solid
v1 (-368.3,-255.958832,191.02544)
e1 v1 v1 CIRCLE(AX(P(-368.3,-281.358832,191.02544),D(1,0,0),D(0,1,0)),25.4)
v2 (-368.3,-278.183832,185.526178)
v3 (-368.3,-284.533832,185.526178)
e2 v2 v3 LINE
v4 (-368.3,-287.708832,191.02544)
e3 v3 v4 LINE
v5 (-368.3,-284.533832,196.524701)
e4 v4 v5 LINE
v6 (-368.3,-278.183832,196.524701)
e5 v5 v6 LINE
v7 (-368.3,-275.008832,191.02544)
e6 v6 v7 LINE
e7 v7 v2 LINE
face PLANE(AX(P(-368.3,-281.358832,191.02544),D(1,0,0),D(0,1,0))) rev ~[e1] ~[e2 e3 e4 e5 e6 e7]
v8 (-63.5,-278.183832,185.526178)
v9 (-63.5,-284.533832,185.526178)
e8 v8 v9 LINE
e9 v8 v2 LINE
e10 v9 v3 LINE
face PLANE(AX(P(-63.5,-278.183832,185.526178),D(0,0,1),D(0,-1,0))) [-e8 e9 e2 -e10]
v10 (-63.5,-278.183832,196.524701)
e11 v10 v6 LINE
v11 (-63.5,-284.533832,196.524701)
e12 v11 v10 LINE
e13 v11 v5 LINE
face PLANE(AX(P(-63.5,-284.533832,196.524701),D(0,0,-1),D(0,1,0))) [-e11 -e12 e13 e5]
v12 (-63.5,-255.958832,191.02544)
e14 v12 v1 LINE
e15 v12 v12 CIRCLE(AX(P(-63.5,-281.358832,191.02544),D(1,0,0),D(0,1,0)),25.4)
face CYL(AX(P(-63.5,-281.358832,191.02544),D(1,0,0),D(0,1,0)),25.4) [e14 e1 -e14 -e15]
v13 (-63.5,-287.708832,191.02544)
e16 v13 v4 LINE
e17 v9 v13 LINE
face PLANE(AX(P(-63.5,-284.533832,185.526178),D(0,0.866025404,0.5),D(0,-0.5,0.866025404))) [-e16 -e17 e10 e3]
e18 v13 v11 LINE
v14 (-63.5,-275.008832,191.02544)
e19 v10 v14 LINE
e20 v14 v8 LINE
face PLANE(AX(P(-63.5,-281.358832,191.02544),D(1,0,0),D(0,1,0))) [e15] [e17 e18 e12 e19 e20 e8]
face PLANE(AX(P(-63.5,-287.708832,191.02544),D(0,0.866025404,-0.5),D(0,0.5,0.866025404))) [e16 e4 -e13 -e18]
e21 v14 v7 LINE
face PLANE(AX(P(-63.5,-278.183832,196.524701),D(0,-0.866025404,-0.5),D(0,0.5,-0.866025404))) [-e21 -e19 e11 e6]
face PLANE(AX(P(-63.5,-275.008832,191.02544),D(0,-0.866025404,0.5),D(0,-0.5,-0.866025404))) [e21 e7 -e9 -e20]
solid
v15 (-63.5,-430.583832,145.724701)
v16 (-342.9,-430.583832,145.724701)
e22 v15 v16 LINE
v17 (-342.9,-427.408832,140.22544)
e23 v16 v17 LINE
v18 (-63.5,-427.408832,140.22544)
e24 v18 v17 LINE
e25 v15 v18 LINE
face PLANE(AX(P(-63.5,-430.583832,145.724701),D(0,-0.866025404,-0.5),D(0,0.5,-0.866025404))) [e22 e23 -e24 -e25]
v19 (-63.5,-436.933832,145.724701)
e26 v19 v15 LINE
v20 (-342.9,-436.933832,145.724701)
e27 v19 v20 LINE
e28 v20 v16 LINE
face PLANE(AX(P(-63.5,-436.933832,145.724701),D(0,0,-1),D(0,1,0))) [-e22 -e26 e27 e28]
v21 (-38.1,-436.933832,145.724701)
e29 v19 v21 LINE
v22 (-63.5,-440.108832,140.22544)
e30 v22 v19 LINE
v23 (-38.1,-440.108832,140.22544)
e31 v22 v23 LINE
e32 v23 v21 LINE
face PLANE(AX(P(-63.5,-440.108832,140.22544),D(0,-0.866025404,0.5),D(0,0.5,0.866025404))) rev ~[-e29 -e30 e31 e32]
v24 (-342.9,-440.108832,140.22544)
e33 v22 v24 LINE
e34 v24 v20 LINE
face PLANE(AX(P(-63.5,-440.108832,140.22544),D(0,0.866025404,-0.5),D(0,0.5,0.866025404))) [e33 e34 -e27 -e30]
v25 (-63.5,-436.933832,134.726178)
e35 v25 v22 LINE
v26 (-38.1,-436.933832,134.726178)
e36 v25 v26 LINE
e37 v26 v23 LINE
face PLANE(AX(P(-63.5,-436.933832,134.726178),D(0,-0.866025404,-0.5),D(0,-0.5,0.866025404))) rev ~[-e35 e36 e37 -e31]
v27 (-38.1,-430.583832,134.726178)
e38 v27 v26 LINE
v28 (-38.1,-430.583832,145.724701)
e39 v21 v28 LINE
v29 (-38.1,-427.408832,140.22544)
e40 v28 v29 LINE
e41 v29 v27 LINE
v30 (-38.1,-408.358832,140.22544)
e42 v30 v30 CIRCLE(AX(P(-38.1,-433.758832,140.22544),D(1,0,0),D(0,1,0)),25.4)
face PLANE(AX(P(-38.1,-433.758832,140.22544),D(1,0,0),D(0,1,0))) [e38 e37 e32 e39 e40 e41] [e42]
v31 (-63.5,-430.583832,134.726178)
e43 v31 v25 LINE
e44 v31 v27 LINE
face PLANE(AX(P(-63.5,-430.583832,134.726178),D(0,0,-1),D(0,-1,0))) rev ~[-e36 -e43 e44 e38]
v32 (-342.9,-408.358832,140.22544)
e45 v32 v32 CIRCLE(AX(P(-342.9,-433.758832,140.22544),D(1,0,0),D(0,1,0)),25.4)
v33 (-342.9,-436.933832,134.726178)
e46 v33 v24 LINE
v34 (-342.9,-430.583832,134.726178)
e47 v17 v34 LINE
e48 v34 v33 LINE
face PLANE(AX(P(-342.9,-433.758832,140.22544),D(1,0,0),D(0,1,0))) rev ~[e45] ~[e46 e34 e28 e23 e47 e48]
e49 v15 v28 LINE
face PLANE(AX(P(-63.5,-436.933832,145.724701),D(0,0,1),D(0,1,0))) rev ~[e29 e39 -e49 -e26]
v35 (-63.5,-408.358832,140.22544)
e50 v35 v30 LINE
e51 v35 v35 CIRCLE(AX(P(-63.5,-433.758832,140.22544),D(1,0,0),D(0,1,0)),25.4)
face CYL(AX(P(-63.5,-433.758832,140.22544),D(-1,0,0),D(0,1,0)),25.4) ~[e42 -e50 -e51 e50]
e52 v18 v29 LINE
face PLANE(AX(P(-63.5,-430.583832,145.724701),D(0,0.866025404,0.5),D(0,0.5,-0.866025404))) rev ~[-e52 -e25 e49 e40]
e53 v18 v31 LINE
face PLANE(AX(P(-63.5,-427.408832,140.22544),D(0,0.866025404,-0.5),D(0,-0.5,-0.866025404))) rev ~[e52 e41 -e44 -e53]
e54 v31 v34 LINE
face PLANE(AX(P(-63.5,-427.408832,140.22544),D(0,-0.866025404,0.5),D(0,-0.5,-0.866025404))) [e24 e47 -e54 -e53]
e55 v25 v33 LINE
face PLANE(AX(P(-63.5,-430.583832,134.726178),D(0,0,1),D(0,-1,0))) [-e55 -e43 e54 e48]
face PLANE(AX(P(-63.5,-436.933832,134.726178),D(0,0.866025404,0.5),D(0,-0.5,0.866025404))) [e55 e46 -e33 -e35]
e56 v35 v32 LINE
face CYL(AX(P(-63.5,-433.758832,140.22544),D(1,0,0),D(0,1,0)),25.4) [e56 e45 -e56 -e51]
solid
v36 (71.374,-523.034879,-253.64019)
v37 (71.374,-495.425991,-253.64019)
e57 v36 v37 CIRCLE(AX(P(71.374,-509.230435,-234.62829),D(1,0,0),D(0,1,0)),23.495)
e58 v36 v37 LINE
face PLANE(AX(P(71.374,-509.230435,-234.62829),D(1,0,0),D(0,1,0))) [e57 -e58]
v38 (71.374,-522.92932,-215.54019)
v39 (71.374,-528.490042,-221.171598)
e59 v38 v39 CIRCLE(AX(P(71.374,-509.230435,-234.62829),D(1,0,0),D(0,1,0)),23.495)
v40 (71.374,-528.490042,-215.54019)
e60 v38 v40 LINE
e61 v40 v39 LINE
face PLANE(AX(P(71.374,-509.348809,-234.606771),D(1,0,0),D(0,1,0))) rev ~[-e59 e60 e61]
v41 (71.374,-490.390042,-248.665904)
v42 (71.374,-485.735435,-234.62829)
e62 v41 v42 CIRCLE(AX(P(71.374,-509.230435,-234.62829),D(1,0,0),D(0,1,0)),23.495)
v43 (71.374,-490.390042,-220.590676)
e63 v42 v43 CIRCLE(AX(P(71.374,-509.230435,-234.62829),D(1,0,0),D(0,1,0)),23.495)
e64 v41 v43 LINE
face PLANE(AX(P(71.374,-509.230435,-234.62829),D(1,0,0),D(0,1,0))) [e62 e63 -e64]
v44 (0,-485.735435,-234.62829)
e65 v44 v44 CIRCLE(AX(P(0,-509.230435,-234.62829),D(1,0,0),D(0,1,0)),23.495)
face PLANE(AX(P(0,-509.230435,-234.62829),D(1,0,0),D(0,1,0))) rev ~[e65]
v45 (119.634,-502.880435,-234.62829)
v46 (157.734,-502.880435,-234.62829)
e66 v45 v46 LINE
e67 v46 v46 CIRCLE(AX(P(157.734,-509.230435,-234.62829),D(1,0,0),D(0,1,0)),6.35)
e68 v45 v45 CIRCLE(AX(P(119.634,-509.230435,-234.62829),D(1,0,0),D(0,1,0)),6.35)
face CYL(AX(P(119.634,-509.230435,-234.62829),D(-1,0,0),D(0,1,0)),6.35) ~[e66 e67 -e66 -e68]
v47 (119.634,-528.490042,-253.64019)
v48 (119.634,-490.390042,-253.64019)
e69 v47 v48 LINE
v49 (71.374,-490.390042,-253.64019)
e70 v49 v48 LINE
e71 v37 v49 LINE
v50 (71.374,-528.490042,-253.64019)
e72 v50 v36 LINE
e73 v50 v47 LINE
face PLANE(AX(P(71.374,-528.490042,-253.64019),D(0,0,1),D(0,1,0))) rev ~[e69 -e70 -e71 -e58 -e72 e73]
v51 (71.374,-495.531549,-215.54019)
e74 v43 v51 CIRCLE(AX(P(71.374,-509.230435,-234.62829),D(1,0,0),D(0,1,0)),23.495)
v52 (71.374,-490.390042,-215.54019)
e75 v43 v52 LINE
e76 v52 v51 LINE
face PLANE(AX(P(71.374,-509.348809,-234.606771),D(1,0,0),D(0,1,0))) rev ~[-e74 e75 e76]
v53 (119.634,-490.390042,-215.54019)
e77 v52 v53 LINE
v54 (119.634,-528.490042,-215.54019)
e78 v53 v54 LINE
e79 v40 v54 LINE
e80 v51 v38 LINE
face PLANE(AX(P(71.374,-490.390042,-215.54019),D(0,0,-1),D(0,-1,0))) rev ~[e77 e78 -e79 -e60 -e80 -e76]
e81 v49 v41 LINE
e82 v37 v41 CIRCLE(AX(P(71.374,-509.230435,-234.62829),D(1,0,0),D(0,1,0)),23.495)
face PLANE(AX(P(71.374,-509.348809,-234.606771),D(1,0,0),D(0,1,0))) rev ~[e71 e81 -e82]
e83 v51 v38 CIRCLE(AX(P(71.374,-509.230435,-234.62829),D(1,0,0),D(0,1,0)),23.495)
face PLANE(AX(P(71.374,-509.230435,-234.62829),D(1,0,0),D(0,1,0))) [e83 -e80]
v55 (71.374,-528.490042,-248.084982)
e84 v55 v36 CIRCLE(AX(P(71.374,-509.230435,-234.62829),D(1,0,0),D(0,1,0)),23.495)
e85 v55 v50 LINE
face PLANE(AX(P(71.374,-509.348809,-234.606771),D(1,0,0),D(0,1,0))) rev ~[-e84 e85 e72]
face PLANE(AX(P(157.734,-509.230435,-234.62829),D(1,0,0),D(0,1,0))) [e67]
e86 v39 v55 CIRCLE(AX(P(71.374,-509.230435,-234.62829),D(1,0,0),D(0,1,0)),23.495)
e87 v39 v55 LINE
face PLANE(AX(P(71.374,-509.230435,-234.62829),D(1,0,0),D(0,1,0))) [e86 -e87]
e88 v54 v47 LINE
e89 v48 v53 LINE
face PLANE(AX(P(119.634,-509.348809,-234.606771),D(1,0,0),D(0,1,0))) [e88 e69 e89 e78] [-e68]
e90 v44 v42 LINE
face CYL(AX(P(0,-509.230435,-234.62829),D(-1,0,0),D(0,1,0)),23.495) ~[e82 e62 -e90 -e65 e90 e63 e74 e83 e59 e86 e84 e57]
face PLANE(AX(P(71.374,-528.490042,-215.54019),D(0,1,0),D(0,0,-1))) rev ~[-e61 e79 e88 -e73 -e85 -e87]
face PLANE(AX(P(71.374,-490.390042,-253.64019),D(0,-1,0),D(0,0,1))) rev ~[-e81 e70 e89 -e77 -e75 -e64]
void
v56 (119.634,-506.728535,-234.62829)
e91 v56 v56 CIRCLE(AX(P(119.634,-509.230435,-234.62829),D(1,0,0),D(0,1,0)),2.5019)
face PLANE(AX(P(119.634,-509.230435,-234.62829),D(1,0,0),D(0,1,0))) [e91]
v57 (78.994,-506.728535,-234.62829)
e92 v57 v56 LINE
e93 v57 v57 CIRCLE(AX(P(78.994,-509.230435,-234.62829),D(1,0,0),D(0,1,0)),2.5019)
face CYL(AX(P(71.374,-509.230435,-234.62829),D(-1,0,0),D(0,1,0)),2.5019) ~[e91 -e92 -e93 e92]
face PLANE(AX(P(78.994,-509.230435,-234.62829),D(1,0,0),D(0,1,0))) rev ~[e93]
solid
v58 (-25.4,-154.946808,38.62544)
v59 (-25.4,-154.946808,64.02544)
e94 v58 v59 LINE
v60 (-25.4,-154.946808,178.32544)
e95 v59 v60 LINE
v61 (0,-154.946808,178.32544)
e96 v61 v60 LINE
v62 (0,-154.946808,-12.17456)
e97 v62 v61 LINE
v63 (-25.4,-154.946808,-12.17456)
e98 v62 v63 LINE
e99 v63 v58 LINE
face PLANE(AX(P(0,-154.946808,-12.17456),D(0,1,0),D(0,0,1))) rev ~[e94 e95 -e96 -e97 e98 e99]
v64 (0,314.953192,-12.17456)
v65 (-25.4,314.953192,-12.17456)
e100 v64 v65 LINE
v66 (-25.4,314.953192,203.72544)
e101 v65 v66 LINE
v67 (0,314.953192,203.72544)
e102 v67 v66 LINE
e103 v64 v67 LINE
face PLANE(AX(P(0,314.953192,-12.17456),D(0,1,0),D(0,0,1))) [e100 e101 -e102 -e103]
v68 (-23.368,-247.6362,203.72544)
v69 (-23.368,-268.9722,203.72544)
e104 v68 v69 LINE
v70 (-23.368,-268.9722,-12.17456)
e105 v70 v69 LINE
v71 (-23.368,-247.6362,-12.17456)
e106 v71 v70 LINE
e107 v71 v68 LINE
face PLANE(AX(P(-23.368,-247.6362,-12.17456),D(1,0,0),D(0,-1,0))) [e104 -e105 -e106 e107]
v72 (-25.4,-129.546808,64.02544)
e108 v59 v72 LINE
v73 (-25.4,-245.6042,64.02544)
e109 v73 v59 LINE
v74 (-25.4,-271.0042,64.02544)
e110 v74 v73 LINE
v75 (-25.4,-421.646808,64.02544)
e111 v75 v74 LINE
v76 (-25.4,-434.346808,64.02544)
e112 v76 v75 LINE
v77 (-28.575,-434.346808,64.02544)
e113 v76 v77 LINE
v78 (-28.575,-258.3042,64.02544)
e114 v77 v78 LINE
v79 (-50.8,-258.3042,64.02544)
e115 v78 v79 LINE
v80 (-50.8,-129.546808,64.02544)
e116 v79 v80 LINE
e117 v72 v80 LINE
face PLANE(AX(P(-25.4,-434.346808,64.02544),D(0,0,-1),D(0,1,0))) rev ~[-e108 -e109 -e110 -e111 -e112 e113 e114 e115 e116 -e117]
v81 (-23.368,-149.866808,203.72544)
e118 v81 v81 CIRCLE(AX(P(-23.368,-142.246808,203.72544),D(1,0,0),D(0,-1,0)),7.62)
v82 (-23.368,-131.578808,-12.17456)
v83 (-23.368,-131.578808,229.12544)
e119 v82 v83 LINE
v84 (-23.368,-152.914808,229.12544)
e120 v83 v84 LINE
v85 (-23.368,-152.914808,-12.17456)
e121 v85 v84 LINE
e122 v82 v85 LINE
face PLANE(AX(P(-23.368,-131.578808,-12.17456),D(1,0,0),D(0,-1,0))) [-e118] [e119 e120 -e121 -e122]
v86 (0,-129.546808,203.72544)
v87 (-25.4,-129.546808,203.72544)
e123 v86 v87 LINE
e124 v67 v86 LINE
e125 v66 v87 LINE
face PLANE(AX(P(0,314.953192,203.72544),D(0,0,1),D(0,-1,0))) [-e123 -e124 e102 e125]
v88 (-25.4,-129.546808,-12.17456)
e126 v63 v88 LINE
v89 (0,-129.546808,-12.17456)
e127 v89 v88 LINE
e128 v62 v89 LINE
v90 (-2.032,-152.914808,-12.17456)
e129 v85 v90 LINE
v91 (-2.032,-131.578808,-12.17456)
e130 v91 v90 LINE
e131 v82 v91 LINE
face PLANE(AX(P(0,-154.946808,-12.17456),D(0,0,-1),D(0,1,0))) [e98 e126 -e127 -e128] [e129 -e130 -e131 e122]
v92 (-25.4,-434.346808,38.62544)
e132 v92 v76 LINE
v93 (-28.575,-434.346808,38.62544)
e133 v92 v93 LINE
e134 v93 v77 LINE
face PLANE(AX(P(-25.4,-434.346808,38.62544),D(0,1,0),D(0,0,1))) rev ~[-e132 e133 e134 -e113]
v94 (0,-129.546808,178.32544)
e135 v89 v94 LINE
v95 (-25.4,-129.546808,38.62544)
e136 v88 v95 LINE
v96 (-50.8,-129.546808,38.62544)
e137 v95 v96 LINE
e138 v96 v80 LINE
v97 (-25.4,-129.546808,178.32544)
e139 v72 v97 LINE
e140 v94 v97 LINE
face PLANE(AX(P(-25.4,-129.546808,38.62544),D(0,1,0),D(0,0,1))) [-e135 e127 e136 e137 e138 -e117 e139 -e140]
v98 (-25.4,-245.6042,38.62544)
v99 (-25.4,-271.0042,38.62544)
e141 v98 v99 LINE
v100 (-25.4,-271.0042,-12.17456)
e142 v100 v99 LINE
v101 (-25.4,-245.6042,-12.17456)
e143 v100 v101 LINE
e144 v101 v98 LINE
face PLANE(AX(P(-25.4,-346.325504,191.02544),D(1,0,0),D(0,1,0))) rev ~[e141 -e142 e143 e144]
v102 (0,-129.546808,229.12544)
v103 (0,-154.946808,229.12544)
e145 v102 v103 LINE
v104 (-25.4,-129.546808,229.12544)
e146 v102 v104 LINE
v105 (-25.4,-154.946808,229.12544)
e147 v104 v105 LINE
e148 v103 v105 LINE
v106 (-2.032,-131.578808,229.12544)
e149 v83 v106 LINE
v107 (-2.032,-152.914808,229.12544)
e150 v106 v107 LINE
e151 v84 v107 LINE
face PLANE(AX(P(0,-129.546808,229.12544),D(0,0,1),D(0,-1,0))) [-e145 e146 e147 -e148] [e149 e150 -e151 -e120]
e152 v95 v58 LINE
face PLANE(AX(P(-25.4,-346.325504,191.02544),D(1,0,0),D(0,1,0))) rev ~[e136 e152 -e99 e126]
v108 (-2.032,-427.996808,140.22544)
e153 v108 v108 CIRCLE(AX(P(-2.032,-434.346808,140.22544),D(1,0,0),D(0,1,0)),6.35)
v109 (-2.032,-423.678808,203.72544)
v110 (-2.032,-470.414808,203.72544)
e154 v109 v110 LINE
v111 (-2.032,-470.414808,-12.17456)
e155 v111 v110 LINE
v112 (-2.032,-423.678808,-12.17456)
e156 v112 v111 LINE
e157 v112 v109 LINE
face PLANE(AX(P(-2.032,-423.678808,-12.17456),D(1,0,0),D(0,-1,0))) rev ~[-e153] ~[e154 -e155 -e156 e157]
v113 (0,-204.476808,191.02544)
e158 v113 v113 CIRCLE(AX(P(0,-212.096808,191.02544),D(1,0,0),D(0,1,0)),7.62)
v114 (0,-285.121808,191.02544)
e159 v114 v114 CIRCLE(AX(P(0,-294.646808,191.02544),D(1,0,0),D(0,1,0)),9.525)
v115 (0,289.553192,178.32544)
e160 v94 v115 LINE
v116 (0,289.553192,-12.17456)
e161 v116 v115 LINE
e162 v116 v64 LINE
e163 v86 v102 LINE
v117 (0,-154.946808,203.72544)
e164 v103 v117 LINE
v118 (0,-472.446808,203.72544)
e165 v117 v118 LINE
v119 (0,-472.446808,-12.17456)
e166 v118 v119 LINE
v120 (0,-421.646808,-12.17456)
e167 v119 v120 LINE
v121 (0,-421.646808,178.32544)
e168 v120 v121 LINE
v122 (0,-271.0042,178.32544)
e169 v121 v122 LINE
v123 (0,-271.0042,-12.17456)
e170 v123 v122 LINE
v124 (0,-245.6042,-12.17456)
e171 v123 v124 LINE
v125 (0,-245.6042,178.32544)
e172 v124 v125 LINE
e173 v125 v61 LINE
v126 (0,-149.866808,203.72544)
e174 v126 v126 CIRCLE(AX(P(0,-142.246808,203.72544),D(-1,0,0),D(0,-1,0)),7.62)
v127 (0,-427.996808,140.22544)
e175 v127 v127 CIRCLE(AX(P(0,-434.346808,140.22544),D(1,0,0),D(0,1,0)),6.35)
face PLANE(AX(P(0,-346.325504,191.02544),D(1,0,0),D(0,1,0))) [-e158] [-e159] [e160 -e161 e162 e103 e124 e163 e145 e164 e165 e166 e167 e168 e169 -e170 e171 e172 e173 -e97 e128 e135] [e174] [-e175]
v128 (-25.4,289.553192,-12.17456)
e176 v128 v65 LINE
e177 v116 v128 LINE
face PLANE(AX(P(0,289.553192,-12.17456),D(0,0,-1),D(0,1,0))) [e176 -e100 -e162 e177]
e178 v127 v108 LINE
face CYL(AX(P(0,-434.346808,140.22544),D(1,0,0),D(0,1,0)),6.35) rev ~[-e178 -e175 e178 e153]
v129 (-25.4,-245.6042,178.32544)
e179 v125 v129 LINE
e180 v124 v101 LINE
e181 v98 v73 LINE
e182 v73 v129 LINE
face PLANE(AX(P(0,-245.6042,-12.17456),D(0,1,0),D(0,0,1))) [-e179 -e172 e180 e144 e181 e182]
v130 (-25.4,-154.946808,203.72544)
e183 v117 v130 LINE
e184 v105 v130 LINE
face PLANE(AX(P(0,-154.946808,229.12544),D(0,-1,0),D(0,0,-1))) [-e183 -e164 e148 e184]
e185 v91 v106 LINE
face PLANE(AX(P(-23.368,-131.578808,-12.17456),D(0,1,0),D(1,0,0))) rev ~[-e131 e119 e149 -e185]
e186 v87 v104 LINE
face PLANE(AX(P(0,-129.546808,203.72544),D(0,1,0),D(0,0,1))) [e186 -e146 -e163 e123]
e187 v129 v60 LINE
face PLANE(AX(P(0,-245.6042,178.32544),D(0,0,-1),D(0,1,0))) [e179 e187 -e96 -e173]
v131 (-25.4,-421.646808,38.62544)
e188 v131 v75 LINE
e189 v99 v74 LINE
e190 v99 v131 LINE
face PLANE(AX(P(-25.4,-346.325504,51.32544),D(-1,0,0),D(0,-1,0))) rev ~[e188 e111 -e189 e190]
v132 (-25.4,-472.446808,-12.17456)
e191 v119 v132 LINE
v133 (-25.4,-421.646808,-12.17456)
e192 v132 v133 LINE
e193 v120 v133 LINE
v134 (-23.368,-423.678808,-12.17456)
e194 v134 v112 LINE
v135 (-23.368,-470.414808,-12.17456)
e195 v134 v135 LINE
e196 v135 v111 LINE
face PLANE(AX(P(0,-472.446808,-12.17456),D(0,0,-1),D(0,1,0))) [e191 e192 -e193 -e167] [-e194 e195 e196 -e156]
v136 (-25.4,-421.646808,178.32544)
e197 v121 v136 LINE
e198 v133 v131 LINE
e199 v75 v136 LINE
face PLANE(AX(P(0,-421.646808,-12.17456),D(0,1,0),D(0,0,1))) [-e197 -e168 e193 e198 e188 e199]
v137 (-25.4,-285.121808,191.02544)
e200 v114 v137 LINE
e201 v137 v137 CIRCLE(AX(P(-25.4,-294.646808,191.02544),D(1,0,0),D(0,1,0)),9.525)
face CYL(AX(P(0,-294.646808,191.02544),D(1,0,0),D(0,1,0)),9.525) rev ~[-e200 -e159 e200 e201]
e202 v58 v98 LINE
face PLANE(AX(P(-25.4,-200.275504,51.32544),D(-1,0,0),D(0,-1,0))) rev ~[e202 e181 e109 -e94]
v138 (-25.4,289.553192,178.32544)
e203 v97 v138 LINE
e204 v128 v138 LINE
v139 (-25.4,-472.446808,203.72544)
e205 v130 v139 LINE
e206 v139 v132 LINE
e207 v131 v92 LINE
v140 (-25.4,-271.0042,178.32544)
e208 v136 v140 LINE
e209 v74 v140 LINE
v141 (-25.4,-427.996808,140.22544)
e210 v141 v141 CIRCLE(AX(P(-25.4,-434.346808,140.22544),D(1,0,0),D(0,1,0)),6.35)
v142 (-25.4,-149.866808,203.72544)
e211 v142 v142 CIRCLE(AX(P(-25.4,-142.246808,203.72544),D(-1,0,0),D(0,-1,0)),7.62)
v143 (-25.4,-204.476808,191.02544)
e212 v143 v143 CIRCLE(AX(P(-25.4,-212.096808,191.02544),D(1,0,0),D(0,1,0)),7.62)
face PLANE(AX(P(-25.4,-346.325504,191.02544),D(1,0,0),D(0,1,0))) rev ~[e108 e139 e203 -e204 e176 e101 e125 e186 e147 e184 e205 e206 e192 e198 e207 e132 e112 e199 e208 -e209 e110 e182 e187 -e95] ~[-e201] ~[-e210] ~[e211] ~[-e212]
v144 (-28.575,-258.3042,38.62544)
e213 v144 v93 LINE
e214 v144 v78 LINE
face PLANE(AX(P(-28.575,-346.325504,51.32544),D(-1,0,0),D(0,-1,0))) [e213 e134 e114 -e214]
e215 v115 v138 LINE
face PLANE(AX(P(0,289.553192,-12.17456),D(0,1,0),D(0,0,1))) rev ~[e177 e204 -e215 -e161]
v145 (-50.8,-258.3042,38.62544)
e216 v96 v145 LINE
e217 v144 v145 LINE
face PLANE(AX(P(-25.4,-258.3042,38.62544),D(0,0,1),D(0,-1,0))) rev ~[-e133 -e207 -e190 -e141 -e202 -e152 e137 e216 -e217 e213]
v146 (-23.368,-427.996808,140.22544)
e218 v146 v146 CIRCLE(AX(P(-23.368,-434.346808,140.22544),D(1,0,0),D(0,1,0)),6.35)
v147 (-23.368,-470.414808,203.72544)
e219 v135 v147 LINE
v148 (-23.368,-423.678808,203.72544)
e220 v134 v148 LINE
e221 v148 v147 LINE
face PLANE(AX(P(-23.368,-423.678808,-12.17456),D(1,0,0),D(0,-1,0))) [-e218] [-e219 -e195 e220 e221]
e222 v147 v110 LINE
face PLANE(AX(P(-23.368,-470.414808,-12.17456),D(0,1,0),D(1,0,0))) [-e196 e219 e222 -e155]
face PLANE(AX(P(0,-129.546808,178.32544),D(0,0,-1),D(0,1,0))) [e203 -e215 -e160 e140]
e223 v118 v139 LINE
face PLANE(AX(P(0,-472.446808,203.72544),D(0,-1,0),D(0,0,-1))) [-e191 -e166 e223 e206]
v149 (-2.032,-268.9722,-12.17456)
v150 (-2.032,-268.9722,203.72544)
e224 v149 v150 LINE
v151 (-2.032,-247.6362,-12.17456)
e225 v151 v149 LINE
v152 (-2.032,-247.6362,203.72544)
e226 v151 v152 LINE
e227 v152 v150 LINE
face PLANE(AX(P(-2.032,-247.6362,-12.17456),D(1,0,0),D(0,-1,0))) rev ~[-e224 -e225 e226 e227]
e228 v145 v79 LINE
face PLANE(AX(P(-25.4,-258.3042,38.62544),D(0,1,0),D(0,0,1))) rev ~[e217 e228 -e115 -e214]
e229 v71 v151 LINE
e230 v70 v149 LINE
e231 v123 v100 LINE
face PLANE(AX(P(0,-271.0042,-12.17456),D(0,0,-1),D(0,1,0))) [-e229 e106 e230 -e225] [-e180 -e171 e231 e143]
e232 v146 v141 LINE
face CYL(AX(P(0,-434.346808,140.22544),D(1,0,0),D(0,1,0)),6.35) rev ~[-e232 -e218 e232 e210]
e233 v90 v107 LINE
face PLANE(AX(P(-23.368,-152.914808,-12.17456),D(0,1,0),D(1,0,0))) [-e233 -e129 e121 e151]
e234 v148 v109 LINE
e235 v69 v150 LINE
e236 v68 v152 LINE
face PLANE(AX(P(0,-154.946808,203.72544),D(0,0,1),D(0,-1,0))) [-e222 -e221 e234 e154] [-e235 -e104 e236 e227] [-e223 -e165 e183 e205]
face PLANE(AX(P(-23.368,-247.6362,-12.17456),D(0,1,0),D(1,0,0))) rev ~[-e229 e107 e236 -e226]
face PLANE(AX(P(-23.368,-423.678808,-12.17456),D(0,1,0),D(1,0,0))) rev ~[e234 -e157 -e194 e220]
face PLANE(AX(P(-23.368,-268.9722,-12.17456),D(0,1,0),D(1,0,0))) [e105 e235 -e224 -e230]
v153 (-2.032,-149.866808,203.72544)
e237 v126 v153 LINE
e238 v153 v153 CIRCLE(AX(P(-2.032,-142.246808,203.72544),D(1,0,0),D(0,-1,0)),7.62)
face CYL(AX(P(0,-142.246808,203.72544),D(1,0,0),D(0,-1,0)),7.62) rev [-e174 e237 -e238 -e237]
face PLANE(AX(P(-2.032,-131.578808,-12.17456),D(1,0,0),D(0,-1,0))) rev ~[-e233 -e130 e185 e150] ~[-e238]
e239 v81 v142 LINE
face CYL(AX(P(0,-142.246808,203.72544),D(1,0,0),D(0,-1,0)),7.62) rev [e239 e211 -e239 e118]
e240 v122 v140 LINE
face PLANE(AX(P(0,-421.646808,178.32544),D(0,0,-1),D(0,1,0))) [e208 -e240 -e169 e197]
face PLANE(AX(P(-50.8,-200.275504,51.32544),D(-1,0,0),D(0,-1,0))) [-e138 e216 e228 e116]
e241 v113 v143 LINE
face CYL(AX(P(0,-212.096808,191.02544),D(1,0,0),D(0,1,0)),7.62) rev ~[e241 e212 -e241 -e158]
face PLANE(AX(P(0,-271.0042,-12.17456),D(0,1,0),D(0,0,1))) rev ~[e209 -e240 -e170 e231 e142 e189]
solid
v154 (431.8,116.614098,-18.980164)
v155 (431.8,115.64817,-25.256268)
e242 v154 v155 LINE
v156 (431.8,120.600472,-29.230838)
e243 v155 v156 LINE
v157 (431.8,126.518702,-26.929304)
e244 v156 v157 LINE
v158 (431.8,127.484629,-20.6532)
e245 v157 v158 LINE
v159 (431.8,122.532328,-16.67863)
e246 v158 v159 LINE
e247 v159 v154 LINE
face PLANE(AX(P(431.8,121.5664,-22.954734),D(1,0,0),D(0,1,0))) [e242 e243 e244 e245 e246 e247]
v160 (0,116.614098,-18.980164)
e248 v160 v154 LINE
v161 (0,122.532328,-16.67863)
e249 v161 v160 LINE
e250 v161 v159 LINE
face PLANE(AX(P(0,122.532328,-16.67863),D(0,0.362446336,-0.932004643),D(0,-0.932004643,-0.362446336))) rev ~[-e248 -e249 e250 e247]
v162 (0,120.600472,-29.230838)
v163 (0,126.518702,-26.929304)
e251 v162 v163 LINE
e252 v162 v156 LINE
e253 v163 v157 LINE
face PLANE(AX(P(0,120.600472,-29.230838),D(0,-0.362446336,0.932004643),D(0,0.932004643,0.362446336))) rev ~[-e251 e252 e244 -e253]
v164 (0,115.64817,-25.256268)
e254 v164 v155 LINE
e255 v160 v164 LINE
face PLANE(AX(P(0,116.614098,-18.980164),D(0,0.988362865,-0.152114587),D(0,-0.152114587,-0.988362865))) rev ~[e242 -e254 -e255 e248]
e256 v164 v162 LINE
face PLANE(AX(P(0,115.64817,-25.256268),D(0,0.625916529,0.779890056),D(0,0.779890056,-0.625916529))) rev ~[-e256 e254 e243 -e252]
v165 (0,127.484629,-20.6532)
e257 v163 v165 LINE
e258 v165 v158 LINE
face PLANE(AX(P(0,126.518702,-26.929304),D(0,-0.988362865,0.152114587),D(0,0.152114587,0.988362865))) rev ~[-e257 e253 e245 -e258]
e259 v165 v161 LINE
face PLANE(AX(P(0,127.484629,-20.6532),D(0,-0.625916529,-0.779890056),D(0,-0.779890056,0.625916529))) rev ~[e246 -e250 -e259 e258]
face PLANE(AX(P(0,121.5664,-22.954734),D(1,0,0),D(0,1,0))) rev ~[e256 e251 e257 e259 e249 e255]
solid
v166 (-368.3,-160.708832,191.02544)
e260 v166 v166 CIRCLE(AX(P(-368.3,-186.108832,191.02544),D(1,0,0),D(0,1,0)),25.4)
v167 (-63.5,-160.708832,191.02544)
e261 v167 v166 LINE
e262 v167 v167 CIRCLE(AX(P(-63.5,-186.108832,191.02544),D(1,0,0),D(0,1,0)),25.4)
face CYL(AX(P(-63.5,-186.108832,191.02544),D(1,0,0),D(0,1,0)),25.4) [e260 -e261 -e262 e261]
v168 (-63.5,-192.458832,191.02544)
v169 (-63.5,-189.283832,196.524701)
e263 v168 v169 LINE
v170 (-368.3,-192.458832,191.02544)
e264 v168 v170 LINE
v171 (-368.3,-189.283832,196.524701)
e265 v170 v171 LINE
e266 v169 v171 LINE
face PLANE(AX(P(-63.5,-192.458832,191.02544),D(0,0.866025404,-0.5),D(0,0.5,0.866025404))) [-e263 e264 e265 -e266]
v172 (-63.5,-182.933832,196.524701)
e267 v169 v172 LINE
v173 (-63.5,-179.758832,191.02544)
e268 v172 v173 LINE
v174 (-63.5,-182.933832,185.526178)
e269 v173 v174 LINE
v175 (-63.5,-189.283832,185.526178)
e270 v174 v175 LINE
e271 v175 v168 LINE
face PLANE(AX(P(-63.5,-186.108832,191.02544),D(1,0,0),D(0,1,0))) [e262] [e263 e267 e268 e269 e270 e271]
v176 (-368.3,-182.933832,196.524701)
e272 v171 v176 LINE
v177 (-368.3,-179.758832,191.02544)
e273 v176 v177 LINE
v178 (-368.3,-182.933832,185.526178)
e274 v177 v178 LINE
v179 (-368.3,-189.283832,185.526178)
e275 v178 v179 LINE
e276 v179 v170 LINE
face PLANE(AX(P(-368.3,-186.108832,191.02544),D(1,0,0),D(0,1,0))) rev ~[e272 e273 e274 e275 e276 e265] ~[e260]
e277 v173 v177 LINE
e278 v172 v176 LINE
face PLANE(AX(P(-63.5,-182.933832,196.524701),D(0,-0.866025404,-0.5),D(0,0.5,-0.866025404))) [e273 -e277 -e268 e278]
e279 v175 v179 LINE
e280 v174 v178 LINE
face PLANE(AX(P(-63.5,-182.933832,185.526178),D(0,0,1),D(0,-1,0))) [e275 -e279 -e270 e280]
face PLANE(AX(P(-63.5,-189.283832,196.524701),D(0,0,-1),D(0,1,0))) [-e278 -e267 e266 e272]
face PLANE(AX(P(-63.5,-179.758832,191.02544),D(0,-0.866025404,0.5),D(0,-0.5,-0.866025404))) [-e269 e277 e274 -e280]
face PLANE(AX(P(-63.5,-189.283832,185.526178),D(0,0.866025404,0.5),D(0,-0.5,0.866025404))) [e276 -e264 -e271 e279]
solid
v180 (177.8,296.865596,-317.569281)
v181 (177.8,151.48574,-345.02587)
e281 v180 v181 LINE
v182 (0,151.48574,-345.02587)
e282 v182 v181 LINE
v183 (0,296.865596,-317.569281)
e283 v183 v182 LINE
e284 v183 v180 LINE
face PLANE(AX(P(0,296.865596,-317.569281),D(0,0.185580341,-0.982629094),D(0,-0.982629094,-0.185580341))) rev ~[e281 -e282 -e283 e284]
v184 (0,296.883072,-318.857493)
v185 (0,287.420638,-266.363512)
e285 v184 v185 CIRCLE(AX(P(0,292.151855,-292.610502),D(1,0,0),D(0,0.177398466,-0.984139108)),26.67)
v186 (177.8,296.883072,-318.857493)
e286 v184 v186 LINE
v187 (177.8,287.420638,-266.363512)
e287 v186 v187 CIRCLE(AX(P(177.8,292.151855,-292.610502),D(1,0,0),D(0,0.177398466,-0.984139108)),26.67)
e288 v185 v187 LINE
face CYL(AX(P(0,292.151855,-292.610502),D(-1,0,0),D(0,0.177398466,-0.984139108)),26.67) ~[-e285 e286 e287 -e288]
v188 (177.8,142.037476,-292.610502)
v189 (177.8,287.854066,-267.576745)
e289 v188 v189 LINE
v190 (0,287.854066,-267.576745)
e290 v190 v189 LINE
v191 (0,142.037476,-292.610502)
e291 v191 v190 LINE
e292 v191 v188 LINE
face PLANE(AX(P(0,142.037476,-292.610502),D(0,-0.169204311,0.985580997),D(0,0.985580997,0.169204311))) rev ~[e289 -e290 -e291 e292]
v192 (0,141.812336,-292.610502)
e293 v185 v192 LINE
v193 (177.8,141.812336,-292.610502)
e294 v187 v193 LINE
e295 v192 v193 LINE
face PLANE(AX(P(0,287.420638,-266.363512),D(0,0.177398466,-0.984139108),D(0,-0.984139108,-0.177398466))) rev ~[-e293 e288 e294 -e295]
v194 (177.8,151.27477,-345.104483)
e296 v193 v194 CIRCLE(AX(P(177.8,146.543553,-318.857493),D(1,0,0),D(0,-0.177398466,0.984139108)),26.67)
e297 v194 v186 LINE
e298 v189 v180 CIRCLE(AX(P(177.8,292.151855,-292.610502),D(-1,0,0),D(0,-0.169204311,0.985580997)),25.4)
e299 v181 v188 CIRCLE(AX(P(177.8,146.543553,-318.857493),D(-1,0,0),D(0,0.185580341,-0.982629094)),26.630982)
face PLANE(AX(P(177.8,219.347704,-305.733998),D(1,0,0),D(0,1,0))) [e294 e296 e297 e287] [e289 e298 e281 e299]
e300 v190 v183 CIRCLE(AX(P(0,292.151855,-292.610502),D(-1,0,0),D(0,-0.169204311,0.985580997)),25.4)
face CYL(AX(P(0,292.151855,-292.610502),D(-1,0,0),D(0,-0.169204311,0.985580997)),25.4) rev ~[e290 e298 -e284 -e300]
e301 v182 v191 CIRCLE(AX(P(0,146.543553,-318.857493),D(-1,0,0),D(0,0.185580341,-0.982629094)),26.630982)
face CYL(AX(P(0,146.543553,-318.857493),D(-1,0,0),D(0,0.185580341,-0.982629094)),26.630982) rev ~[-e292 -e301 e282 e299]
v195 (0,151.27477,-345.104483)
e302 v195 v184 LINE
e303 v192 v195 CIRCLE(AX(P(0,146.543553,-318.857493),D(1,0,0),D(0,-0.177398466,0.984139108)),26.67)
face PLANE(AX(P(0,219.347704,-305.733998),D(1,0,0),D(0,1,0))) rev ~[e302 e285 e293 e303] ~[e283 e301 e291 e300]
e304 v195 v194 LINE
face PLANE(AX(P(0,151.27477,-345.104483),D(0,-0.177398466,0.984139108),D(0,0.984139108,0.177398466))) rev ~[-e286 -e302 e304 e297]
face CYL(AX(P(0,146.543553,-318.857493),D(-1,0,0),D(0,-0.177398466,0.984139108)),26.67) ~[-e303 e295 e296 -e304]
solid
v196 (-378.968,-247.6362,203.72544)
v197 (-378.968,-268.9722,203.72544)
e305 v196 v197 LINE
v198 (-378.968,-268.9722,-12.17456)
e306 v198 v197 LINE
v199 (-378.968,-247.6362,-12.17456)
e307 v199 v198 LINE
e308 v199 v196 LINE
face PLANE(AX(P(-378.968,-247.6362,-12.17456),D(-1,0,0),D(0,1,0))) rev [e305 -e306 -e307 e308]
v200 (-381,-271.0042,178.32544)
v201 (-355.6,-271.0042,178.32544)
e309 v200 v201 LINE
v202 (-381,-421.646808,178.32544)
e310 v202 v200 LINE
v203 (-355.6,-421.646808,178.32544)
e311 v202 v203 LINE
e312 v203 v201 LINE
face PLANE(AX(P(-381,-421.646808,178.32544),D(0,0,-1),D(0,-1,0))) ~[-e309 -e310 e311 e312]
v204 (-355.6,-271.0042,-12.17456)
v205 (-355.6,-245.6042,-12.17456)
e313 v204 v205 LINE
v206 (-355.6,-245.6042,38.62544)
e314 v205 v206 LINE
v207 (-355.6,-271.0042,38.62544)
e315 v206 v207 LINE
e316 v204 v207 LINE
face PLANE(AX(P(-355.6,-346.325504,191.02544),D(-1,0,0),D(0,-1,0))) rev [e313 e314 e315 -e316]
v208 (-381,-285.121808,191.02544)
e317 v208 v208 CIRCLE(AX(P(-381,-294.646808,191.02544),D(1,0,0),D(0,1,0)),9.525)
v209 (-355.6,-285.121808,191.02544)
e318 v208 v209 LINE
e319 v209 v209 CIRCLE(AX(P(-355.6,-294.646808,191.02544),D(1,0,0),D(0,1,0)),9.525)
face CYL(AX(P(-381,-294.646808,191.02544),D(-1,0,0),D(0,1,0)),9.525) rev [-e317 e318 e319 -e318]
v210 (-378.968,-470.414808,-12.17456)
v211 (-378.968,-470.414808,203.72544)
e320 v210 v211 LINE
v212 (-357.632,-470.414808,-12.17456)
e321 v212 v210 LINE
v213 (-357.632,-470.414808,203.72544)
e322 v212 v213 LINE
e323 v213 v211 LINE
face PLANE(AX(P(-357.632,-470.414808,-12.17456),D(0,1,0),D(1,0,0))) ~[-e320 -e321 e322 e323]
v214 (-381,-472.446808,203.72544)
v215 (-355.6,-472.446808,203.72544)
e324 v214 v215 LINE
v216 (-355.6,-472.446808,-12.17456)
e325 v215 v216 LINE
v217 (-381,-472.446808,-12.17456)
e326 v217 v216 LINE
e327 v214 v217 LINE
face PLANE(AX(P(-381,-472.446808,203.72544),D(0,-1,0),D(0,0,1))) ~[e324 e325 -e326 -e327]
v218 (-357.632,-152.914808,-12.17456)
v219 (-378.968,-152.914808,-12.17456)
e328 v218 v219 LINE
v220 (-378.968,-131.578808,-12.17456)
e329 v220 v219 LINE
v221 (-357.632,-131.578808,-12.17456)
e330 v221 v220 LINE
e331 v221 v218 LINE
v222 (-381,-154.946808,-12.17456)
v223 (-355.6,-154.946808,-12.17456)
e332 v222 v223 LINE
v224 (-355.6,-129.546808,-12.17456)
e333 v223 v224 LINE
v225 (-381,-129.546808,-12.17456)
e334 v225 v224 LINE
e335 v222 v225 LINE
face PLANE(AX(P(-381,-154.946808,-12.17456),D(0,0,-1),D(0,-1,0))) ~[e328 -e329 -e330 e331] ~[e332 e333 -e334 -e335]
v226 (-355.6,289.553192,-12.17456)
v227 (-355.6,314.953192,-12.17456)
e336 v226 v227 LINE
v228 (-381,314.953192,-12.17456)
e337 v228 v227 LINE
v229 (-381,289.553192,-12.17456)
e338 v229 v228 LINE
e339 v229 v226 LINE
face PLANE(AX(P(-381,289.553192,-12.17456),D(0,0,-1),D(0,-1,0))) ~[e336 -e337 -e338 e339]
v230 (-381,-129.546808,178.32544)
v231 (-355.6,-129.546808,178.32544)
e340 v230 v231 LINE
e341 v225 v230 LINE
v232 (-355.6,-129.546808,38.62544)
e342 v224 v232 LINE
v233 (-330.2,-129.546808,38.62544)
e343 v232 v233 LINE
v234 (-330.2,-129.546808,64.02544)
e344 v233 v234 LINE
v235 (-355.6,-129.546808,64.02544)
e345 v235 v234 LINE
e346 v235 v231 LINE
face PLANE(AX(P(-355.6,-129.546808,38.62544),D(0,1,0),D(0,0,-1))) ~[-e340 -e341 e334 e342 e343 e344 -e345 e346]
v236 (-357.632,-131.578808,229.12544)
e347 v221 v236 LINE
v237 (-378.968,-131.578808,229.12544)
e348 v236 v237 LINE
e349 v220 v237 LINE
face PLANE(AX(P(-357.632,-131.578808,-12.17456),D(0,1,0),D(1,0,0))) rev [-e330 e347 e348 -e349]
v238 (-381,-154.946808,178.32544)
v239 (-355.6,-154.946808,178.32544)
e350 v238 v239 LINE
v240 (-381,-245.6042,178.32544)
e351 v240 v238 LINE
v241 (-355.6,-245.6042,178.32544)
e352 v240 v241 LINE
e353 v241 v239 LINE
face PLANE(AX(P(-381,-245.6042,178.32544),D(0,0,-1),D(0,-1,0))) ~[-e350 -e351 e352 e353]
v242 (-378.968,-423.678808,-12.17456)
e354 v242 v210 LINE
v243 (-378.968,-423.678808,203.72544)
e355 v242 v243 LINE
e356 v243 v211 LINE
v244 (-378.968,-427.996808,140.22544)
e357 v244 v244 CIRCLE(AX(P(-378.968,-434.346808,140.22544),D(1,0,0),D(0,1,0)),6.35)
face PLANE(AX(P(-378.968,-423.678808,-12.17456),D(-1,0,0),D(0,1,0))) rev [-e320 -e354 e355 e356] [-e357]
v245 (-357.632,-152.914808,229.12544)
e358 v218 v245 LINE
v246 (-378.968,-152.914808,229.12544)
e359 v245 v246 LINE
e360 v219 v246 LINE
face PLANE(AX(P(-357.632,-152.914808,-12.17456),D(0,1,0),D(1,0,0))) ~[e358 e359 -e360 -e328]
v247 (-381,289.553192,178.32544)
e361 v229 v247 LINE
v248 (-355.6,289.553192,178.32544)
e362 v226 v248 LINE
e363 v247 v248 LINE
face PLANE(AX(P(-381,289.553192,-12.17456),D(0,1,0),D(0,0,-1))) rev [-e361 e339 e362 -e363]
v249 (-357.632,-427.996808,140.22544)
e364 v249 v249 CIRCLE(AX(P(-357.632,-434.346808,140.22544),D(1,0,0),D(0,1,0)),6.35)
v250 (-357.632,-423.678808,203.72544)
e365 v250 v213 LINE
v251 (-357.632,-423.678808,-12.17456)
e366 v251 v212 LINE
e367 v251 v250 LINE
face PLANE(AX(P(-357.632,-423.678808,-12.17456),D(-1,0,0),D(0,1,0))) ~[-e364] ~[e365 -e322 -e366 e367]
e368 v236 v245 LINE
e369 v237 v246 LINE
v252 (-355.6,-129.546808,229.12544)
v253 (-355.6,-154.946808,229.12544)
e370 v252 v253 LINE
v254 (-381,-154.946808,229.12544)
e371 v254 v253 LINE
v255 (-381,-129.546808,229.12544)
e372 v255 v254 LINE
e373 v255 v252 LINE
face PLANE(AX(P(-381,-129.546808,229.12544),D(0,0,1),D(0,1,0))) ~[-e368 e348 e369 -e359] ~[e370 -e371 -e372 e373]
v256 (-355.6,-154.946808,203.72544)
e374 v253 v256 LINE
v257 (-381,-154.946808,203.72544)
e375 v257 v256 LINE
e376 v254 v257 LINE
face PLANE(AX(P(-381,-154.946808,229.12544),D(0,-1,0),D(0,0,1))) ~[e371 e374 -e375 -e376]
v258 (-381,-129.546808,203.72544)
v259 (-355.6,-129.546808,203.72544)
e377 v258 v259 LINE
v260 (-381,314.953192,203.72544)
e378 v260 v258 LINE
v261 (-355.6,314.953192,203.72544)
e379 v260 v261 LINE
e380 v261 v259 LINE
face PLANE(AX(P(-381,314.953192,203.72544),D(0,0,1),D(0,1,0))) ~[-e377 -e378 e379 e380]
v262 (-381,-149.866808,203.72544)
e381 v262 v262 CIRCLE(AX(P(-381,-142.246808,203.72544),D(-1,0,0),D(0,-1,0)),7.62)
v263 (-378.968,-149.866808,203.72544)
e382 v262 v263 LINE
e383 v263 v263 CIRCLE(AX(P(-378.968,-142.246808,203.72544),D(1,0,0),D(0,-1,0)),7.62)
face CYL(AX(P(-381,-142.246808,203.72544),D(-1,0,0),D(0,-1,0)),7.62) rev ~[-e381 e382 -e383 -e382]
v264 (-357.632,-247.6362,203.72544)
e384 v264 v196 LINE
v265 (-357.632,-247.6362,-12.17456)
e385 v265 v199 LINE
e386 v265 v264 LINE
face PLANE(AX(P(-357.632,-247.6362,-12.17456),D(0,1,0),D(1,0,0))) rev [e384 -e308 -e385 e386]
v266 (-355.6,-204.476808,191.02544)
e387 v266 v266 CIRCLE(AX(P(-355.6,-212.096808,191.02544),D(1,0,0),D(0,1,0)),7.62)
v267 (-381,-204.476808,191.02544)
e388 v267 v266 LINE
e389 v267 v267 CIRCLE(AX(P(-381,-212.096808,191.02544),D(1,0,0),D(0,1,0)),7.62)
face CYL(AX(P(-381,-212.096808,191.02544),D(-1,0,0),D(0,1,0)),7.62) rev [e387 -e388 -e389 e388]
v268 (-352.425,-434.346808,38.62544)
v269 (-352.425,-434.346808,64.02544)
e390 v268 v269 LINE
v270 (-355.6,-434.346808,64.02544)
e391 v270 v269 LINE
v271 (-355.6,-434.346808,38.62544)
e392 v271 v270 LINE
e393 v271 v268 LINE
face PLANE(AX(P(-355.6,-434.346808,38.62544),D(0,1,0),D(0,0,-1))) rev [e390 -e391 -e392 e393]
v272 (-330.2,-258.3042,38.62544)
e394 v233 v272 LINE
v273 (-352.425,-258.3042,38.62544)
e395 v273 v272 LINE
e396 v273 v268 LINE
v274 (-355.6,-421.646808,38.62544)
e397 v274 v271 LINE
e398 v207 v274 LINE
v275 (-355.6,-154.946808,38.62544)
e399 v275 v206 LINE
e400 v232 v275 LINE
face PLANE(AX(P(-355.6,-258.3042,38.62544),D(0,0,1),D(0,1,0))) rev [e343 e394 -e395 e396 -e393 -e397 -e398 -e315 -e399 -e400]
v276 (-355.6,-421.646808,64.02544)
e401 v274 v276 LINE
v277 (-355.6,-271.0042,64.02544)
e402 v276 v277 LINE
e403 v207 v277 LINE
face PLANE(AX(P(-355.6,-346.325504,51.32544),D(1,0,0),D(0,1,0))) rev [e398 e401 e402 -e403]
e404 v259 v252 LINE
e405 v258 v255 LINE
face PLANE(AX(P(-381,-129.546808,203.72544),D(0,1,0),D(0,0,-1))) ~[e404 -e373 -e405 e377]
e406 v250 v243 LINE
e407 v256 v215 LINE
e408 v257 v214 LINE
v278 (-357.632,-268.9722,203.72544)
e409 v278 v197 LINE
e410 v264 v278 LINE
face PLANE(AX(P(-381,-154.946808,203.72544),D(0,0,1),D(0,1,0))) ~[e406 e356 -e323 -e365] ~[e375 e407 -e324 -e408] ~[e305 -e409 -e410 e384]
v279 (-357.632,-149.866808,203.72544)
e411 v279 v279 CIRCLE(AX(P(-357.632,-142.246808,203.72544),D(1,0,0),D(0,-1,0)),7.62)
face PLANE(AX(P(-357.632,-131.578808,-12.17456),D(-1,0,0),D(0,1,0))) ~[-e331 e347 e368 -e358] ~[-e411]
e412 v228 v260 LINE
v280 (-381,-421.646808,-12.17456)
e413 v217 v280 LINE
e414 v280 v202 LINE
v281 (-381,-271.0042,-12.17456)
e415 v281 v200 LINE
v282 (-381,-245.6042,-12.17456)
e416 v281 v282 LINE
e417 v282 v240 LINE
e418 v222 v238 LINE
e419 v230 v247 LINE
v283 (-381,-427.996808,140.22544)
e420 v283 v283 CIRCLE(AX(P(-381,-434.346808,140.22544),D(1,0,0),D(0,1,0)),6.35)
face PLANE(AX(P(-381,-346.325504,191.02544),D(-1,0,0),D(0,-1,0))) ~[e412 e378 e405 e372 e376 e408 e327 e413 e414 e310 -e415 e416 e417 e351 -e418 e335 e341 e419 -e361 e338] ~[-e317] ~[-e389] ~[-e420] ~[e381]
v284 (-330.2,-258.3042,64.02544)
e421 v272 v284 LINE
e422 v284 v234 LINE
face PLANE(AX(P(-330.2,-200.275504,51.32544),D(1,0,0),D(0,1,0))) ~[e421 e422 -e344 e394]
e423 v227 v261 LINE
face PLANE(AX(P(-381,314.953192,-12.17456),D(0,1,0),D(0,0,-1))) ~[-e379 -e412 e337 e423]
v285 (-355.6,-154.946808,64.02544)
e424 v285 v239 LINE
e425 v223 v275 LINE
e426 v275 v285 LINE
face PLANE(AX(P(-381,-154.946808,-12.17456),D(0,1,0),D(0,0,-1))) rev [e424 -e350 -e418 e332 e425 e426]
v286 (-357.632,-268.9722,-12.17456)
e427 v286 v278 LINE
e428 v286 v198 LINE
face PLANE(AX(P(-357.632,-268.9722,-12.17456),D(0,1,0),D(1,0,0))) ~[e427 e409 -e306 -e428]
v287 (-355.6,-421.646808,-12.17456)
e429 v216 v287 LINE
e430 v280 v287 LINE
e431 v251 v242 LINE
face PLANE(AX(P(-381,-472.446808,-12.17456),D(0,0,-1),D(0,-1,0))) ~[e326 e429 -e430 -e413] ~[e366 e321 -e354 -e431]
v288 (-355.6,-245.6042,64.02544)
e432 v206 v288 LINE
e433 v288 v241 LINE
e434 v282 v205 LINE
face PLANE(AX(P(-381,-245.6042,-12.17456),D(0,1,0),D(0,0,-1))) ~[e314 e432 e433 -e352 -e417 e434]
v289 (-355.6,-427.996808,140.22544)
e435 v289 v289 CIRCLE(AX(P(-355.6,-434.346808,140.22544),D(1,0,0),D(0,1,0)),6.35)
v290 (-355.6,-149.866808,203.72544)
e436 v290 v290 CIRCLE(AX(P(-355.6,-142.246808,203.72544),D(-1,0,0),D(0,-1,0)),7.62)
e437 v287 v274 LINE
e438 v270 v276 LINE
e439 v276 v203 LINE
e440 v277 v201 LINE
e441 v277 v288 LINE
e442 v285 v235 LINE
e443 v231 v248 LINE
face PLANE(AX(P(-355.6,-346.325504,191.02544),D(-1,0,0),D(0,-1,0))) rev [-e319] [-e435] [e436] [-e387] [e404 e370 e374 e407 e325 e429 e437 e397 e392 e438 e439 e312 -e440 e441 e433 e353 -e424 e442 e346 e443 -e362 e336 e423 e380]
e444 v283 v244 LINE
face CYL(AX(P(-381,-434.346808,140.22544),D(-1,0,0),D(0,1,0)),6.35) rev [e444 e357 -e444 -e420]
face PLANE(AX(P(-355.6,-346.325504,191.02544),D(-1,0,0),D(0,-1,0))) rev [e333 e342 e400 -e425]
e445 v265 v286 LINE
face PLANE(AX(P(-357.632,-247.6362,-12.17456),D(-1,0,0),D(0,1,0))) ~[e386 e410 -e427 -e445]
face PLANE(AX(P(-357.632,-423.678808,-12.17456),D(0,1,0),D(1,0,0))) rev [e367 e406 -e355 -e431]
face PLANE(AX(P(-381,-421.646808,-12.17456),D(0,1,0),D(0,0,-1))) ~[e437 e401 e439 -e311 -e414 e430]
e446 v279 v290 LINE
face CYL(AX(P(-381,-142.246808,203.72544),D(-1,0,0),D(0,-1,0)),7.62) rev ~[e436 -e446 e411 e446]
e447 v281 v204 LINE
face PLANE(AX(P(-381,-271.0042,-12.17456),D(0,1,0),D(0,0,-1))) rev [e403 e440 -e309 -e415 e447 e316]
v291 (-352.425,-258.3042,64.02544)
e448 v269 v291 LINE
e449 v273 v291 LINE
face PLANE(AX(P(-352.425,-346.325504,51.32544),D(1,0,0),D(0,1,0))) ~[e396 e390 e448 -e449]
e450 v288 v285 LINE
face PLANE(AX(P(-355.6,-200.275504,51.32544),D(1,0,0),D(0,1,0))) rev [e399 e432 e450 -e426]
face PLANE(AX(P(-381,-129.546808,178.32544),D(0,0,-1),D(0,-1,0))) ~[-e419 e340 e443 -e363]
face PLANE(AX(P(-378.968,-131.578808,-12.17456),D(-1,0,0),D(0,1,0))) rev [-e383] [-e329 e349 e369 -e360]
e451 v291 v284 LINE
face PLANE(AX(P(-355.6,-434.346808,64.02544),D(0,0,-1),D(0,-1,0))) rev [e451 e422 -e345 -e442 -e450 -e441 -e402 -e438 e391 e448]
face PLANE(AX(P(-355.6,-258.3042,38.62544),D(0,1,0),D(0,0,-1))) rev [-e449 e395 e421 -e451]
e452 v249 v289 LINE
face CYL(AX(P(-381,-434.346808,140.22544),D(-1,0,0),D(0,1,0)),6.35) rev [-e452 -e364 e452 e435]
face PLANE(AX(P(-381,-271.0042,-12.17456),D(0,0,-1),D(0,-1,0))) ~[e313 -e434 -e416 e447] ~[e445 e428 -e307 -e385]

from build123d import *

# Parameters (mm, degrees)
F2_R      = 25.4
F3_DEPTH  = 304.8
F0_W      = 150.642607832
F0_H      = 25.4
F0_R      = 9.525
F0_W_2    = 25.4
F0_W_3    = 90.657392168
F0_R_2    = 7.62
F0_H_2    = 190.5
F0_R_3    = 6.35
F0_W_4    = 419.1
F4_DEPTH  = 25.4
F6_DEPTH  = 279.4
F7_DEPTH  = 25.4
F9_DEPTH  = 431.8
F10_W     = 90.657392168
F10_H     = 25.4
F10_W_2   = 25.4
F10_W_3   = 12.7
F11_DEPTH = 25.4
F12_W     = 150.642607832
F12_H     = 25.4
F12_W_2   = 12.7
F13_DEPTH = 3.175
F14_W     = 21.336
F14_H     = 21.336
F15_DEPTH = 241.3
F16_W     = 21.336
F16_H     = 21.336
F17_DEPTH = 215.9
F18_W     = 21.336
F18_H     = 46.736
F19_DEPTH = 215.9
F22_DEPTH = 177.8
F23_R     = 23.495
F24_DEPTH = 71.374
F25_R     = 2.5019
F26_DEPTH = 7.62
F27_R     = 2.5019
F28_DEPTH = 48.26
F29_R     = 6.35
F29_R_2   = 2.5019
F30_DEPTH = 38.1


# Not quite as in the source:
# - a length typed as a fraction of an inch, garbled in the dataset ("3 / 203.2 mm" for 3/8 in), is restored


with BuildPart() as f3:
    # F2 (on offset) → F3 (new body)
    with BuildSketch(Plane.YZ.offset(-63.5)):
        with Locations((-281.3588317816, 191.0254396081)):
            Circle(F2_R)
        Polygon((-275.0088317816, 191.0254396081), (-278.1838317816, 185.5261782941), (-284.5338317816, 185.5261782941), (-287.7088317816, 191.0254396081), (-284.5338317816, 196.5247009221), (-278.1838317816, 196.5247009221), align=None, mode=Mode.SUBTRACT)
    extrude(amount=-F3_DEPTH)


with BuildPart() as f3b:
    # F2 (on offset) → F3, piece 2 (new body)
    with BuildSketch(Plane.YZ.offset(-63.5)):
        with Locations((-186.1088317816, 191.0254396081)):
            Circle(F2_R)
        Polygon((-179.7588317816, 191.0254396081), (-182.9338317816, 185.5261782941), (-189.2838317816, 185.5261782941), (-192.4588317816, 191.0254396081), (-189.2838317816, 196.5247009221), (-182.9338317816, 196.5247009221), align=None, mode=Mode.SUBTRACT)
    extrude(amount=-F3_DEPTH)


with BuildPart() as f4:
    # F0 (on Right) → F4 (new body)
    with BuildSketch(Plane.YZ):
        with Locations((-346.3255038977, 191.0254396081)):
            Rectangle(F0_W, F0_H)
        with Locations((-294.6468078136, 191.0254396081)):
            Circle(F0_R, mode=Mode.SUBTRACT)
        with Locations((-258.3041999817, 191.0254396081)):
            Rectangle(F0_W_2, F0_H)
        with Locations((-200.2755038977, 191.0254396081)):
            Rectangle(F0_W_3, F0_H)
        with Locations((-212.0968078136, 191.0254396081)):
            Circle(F0_R_2, mode=Mode.SUBTRACT)
        with Locations((-142.2468078136, 83.0754396081)):
            Rectangle(F0_W_2, F0_H_2)
        Polygon((-472.4468078136, 203.7254396081), (-472.4468078136, -12.1745603919), (-421.6468078136, -12.1745603919), (-421.6468078136, 178.3254396081), (-421.6468078136, 203.7254396081), align=None)
        with Locations((-434.3468078136, 140.2254396081)):
            Circle(F0_R_3, mode=Mode.SUBTRACT)
        with BuildLine():
            Line((-154.9468078136, 229.1254396081), (-154.9468078136, 203.7254396081))
            Line((-154.9468078136, 203.7254396081), (-149.8668078136, 203.7254396081))
            ThreePointArc((-149.8668078136, 203.7254396081), (-142.2468078136, 211.3454396081), (-134.6268078136, 203.7254396081))
            Line((-134.6268078136, 203.7254396081), (-129.5468078136, 203.7254396081))
            Line((-129.5468078136, 203.7254396081), (-129.5468078136, 229.1254396081))
            Line((-129.5468078136, 229.1254396081), (-154.9468078136, 229.1254396081))
        make_face()
        with Locations((302.2531921864, 191.0254396081)):
            Rectangle(F0_W_2, F0_H)
        with Locations((-258.3041999817, 83.0754396081)):
            Rectangle(F0_W_2, F0_H_2)
        with BuildLine():
            Line((-149.8668078136, 203.7254396081), (-154.9468078136, 203.7254396081))
            Line((-154.9468078136, 203.7254396081), (-154.9468078136, 178.3254396081))
            Line((-154.9468078136, 178.3254396081), (-129.5468078136, 178.3254396081))
            Line((-129.5468078136, 178.3254396081), (-129.5468078136, 203.7254396081))
            Line((-129.5468078136, 203.7254396081), (-134.6268078136, 203.7254396081))
            ThreePointArc((-134.6268078136, 203.7254396081), (-142.2468078136, 196.1054396081), (-149.8668078136, 203.7254396081))
        make_face()
        with Locations((80.0031921864, 191.0254396081)):
            Rectangle(F0_W_4, F0_H)
        with Locations((302.2531921864, 83.0754396081)):
            Rectangle(F0_W_2, F0_H_2)
    extrude(amount=-F4_DEPTH)

    # F10 (on face) → F11 (join)
    with BuildSketch(Plane(origin=(-25.4, 0, 0), x_dir=(0, -1, 0), z_dir=(-1, 0, 0))):
        with Locations((200.2755038977, 51.3254396081)):
            Rectangle(F10_W, F10_H)
        with Locations((142.2468078136, 51.3254396081)):
            Rectangle(F10_W_2, F10_H)
        with Locations((251.9541999817, 51.3254396081)):
            Rectangle(F10_W_3, F10_H)
    extrude(amount=F11_DEPTH)

    # F12 (on face) → F13 (join)
    with BuildSketch(Plane(origin=(-25.4, 0, 0), x_dir=(0, -1, 0), z_dir=(-1, 0, 0))):
        with Locations((346.3255038977, 51.3254396081)):
            Rectangle(F12_W, F12_H)
        with Locations((427.9968078136, 51.3254396081)):
            Rectangle(F12_W_2, F12_H)
        with Locations((264.6541999817, 51.3254396081)):
            Rectangle(F12_W_2, F12_H)
    extrude(amount=F13_DEPTH)

    # F14 (on face) → F15 (cut, through all)
    with BuildSketch(Plane(origin=(0, 0, -12.1745603919), x_dir=(1, 0, 0), z_dir=(0, 0, -1))):
        with Locations((-12.7, 142.2468078136)):
            Rectangle(F14_W, F14_H)
    extrude(amount=-F15_DEPTH, mode=Mode.SUBTRACT)

    # F16 (on face) → F17 (cut, through all)
    with BuildSketch(Plane(origin=(0, 0, -12.1745603919), x_dir=(1, 0, 0), z_dir=(0, 0, -1))):
        with Locations((-12.7, 258.3041999817)):
            Rectangle(F16_W, F16_H)
    extrude(amount=-F17_DEPTH, mode=Mode.SUBTRACT)

    # F18 (on face) → F19 (cut, through all)
    with BuildSketch(Plane(origin=(0, 0, -12.1745603919), x_dir=(1, 0, 0), z_dir=(0, 0, -1))):
        with Locations((-12.7, 447.0468078136)):
            Rectangle(F18_W, F18_H)
    extrude(amount=-F19_DEPTH, mode=Mode.SUBTRACT)


with BuildPart() as f6:
    # F2 (on offset) → F6 (new body)
    with BuildSketch(Plane.YZ.offset(-63.5)):
        with Locations((-433.7588317816, 140.2254396081)):
            Circle(F2_R)
        Polygon((-427.4088317816, 140.2254396081), (-430.5838317816, 134.7261782941), (-436.9338317816, 134.7261782941), (-440.1088317816, 140.2254396081), (-436.9338317816, 145.7247009221), (-430.5838317816, 145.7247009221), align=None, mode=Mode.SUBTRACT)
    extrude(amount=-F6_DEPTH)

    # F2 (on offset) → F7 (join)
    with BuildSketch(Plane.YZ.offset(-63.5)):
        with Locations((-433.7588317816, 140.2254396081)):
            Circle(F2_R)
        Polygon((-427.4088317816, 140.2254396081), (-430.5838317816, 134.7261782941), (-436.9338317816, 134.7261782941), (-440.1088317816, 140.2254396081), (-436.9338317816, 145.7247009221), (-430.5838317816, 145.7247009221), align=None, mode=Mode.SUBTRACT)
    extrude(amount=F7_DEPTH)


with BuildPart() as f9:
    # F8 (on Right) → F9 (new body)
    with BuildSketch(Plane.YZ):
        Polygon((120.6004723048, -29.2308382335), (126.5187017848, -26.9293040012), (127.4846294119, -20.65319981), (122.532327559, -16.6786298511), (116.6140980791, -18.9801640834), (115.648170452, -25.2562682746), align=None)
    extrude(amount=F9_DEPTH)


with BuildPart() as f20_1:
    # F20: instance of F4
    add(f4.part.mirror(Plane.YZ.offset(-190.5)))


with BuildPart() as f22:
    # F21 (on Right) → F22 (new body)
    with BuildSketch(Plane.YZ):
        with BuildLine():
            ThreePointArc((141.8123362125, -292.6105024954), (120.2965632809, -323.5887095958), (151.2747703813, -345.1044825274))
            Line((151.2747703813, -345.1044825274), (296.8830721368, -318.8574925114))
            ThreePointArc((296.8830721368, -318.8574925114), (318.3988450683, -287.879285411), (287.4206379679, -266.3635124794))
            Line((287.4206379679, -266.3635124794), (141.8123362125, -292.6105024954))
        make_face()
        with BuildLine():
            ThreePointArc((287.8540655576, -267.5767451773), (317.1489884009, -288.1045814626), (296.8655957088, -317.5692814924))
            Line((296.8655957088, -317.5692814924), (151.4857400561, -345.025870467))
            ThreePointArc((151.4857400561, -345.025870467), (120.3349621896, -323.5817879041), (142.0374763015, -292.6105024954))
            Line((142.0374763015, -292.6105024954), (287.8540655576, -267.5767451773))
        make_face(mode=Mode.SUBTRACT)
    extrude(amount=F22_DEPTH)


with BuildPart() as f24:
    # F23 (on Right) → F24 (new body)
    with BuildSketch(Plane.YZ):
        with Locations((-509.2304348946, -234.628289938)):
            Circle(F23_R)
    extrude(amount=F24_DEPTH)

    # F25 (on face) → F26 (join)
    with BuildSketch(Plane.YZ.offset(71.374)):
        with Locations((-509.2304348946, -234.628289938)):
            Circle(F25_R)
    extrude(amount=F26_DEPTH)

    # F27 (on face) → F28 (join)
    with BuildSketch(Plane.YZ.offset(71.374)):
        with BuildLine():
            Line((-495.5315494147, -215.540189938), (-522.9293203744, -215.540189938))
            ThreePointArc((-522.9293203744, -215.540189938), (-525.9485013077, -218.1200713665), (-528.4900418615, -221.1715977561))
            Line((-528.4900418615, -221.1715977561), (-528.4900418615, -248.0849821198))
            ThreePointArc((-528.4900418615, -248.0849821198), (-525.9941742028, -251.0901266947), (-523.0348792293, -253.640189938))
            Line((-523.0348792293, -253.640189938), (-495.4259905599, -253.640189938))
            ThreePointArc((-495.4259905599, -253.640189938), (-492.7196132543, -251.3437855562), (-490.3900418615, -248.6659042424))
            Line((-490.3900418615, -248.6659042424), (-490.3900418615, -220.5906756335))
            ThreePointArc((-490.3900418615, -220.5906756335), (-492.7659879565, -217.8671142028), (-495.5315494147, -215.540189938))
        make_face()
        with Locations((-509.2304348946, -234.628289938)):
            Circle(F27_R, mode=Mode.SUBTRACT)
        with BuildLine():
            Line((-522.9293203744, -215.540189938), (-528.4900418615, -215.540189938))
            Line((-528.4900418615, -215.540189938), (-528.4900418615, -221.1715977561))
            ThreePointArc((-528.4900418615, -221.1715977561), (-525.9485013077, -218.1200713665), (-522.9293203744, -215.540189938))
        make_face()
        with BuildLine():
            ThreePointArc((-523.0348792293, -253.640189938), (-525.9941742028, -251.0901266947), (-528.4900418615, -248.0849821198))
            Line((-528.4900418615, -248.0849821198), (-528.4900418615, -253.640189938))
            Line((-528.4900418615, -253.640189938), (-523.0348792293, -253.640189938))
        make_face()
        with BuildLine():
            Line((-490.3900418615, -253.640189938), (-490.3900418615, -248.6659042424))
            ThreePointArc((-490.3900418615, -248.6659042424), (-492.7196132543, -251.3437855562), (-495.4259905599, -253.640189938))
            Line((-495.4259905599, -253.640189938), (-490.3900418615, -253.640189938))
        make_face()
        with BuildLine():
            Line((-490.3900418615, -215.540189938), (-495.5315494147, -215.540189938))
            ThreePointArc((-495.5315494147, -215.540189938), (-492.7659879565, -217.8671142028), (-490.3900418615, -220.5906756335))
            Line((-490.3900418615, -220.5906756335), (-490.3900418615, -215.540189938))
        make_face()
    extrude(amount=F28_DEPTH)

    # F29 (on face) → F30 (join)
    with BuildSketch(Plane.YZ.offset(119.634)):
        with Locations((-509.2304348946, -234.628289938)):
            Circle(F29_R)
        with Locations((-509.2304348946, -234.628289938)):
            Circle(F29_R_2, mode=Mode.SUBTRACT)
        with Locations((-509.2304348946, -234.628289938)):
            Circle(F29_R_2)
    extrude(amount=F30_DEPTH)


solid = Compound([f3.part, f3b.part, f4.part, f6.part, f9.part, f20_1.part, f22.part, f24.part])
